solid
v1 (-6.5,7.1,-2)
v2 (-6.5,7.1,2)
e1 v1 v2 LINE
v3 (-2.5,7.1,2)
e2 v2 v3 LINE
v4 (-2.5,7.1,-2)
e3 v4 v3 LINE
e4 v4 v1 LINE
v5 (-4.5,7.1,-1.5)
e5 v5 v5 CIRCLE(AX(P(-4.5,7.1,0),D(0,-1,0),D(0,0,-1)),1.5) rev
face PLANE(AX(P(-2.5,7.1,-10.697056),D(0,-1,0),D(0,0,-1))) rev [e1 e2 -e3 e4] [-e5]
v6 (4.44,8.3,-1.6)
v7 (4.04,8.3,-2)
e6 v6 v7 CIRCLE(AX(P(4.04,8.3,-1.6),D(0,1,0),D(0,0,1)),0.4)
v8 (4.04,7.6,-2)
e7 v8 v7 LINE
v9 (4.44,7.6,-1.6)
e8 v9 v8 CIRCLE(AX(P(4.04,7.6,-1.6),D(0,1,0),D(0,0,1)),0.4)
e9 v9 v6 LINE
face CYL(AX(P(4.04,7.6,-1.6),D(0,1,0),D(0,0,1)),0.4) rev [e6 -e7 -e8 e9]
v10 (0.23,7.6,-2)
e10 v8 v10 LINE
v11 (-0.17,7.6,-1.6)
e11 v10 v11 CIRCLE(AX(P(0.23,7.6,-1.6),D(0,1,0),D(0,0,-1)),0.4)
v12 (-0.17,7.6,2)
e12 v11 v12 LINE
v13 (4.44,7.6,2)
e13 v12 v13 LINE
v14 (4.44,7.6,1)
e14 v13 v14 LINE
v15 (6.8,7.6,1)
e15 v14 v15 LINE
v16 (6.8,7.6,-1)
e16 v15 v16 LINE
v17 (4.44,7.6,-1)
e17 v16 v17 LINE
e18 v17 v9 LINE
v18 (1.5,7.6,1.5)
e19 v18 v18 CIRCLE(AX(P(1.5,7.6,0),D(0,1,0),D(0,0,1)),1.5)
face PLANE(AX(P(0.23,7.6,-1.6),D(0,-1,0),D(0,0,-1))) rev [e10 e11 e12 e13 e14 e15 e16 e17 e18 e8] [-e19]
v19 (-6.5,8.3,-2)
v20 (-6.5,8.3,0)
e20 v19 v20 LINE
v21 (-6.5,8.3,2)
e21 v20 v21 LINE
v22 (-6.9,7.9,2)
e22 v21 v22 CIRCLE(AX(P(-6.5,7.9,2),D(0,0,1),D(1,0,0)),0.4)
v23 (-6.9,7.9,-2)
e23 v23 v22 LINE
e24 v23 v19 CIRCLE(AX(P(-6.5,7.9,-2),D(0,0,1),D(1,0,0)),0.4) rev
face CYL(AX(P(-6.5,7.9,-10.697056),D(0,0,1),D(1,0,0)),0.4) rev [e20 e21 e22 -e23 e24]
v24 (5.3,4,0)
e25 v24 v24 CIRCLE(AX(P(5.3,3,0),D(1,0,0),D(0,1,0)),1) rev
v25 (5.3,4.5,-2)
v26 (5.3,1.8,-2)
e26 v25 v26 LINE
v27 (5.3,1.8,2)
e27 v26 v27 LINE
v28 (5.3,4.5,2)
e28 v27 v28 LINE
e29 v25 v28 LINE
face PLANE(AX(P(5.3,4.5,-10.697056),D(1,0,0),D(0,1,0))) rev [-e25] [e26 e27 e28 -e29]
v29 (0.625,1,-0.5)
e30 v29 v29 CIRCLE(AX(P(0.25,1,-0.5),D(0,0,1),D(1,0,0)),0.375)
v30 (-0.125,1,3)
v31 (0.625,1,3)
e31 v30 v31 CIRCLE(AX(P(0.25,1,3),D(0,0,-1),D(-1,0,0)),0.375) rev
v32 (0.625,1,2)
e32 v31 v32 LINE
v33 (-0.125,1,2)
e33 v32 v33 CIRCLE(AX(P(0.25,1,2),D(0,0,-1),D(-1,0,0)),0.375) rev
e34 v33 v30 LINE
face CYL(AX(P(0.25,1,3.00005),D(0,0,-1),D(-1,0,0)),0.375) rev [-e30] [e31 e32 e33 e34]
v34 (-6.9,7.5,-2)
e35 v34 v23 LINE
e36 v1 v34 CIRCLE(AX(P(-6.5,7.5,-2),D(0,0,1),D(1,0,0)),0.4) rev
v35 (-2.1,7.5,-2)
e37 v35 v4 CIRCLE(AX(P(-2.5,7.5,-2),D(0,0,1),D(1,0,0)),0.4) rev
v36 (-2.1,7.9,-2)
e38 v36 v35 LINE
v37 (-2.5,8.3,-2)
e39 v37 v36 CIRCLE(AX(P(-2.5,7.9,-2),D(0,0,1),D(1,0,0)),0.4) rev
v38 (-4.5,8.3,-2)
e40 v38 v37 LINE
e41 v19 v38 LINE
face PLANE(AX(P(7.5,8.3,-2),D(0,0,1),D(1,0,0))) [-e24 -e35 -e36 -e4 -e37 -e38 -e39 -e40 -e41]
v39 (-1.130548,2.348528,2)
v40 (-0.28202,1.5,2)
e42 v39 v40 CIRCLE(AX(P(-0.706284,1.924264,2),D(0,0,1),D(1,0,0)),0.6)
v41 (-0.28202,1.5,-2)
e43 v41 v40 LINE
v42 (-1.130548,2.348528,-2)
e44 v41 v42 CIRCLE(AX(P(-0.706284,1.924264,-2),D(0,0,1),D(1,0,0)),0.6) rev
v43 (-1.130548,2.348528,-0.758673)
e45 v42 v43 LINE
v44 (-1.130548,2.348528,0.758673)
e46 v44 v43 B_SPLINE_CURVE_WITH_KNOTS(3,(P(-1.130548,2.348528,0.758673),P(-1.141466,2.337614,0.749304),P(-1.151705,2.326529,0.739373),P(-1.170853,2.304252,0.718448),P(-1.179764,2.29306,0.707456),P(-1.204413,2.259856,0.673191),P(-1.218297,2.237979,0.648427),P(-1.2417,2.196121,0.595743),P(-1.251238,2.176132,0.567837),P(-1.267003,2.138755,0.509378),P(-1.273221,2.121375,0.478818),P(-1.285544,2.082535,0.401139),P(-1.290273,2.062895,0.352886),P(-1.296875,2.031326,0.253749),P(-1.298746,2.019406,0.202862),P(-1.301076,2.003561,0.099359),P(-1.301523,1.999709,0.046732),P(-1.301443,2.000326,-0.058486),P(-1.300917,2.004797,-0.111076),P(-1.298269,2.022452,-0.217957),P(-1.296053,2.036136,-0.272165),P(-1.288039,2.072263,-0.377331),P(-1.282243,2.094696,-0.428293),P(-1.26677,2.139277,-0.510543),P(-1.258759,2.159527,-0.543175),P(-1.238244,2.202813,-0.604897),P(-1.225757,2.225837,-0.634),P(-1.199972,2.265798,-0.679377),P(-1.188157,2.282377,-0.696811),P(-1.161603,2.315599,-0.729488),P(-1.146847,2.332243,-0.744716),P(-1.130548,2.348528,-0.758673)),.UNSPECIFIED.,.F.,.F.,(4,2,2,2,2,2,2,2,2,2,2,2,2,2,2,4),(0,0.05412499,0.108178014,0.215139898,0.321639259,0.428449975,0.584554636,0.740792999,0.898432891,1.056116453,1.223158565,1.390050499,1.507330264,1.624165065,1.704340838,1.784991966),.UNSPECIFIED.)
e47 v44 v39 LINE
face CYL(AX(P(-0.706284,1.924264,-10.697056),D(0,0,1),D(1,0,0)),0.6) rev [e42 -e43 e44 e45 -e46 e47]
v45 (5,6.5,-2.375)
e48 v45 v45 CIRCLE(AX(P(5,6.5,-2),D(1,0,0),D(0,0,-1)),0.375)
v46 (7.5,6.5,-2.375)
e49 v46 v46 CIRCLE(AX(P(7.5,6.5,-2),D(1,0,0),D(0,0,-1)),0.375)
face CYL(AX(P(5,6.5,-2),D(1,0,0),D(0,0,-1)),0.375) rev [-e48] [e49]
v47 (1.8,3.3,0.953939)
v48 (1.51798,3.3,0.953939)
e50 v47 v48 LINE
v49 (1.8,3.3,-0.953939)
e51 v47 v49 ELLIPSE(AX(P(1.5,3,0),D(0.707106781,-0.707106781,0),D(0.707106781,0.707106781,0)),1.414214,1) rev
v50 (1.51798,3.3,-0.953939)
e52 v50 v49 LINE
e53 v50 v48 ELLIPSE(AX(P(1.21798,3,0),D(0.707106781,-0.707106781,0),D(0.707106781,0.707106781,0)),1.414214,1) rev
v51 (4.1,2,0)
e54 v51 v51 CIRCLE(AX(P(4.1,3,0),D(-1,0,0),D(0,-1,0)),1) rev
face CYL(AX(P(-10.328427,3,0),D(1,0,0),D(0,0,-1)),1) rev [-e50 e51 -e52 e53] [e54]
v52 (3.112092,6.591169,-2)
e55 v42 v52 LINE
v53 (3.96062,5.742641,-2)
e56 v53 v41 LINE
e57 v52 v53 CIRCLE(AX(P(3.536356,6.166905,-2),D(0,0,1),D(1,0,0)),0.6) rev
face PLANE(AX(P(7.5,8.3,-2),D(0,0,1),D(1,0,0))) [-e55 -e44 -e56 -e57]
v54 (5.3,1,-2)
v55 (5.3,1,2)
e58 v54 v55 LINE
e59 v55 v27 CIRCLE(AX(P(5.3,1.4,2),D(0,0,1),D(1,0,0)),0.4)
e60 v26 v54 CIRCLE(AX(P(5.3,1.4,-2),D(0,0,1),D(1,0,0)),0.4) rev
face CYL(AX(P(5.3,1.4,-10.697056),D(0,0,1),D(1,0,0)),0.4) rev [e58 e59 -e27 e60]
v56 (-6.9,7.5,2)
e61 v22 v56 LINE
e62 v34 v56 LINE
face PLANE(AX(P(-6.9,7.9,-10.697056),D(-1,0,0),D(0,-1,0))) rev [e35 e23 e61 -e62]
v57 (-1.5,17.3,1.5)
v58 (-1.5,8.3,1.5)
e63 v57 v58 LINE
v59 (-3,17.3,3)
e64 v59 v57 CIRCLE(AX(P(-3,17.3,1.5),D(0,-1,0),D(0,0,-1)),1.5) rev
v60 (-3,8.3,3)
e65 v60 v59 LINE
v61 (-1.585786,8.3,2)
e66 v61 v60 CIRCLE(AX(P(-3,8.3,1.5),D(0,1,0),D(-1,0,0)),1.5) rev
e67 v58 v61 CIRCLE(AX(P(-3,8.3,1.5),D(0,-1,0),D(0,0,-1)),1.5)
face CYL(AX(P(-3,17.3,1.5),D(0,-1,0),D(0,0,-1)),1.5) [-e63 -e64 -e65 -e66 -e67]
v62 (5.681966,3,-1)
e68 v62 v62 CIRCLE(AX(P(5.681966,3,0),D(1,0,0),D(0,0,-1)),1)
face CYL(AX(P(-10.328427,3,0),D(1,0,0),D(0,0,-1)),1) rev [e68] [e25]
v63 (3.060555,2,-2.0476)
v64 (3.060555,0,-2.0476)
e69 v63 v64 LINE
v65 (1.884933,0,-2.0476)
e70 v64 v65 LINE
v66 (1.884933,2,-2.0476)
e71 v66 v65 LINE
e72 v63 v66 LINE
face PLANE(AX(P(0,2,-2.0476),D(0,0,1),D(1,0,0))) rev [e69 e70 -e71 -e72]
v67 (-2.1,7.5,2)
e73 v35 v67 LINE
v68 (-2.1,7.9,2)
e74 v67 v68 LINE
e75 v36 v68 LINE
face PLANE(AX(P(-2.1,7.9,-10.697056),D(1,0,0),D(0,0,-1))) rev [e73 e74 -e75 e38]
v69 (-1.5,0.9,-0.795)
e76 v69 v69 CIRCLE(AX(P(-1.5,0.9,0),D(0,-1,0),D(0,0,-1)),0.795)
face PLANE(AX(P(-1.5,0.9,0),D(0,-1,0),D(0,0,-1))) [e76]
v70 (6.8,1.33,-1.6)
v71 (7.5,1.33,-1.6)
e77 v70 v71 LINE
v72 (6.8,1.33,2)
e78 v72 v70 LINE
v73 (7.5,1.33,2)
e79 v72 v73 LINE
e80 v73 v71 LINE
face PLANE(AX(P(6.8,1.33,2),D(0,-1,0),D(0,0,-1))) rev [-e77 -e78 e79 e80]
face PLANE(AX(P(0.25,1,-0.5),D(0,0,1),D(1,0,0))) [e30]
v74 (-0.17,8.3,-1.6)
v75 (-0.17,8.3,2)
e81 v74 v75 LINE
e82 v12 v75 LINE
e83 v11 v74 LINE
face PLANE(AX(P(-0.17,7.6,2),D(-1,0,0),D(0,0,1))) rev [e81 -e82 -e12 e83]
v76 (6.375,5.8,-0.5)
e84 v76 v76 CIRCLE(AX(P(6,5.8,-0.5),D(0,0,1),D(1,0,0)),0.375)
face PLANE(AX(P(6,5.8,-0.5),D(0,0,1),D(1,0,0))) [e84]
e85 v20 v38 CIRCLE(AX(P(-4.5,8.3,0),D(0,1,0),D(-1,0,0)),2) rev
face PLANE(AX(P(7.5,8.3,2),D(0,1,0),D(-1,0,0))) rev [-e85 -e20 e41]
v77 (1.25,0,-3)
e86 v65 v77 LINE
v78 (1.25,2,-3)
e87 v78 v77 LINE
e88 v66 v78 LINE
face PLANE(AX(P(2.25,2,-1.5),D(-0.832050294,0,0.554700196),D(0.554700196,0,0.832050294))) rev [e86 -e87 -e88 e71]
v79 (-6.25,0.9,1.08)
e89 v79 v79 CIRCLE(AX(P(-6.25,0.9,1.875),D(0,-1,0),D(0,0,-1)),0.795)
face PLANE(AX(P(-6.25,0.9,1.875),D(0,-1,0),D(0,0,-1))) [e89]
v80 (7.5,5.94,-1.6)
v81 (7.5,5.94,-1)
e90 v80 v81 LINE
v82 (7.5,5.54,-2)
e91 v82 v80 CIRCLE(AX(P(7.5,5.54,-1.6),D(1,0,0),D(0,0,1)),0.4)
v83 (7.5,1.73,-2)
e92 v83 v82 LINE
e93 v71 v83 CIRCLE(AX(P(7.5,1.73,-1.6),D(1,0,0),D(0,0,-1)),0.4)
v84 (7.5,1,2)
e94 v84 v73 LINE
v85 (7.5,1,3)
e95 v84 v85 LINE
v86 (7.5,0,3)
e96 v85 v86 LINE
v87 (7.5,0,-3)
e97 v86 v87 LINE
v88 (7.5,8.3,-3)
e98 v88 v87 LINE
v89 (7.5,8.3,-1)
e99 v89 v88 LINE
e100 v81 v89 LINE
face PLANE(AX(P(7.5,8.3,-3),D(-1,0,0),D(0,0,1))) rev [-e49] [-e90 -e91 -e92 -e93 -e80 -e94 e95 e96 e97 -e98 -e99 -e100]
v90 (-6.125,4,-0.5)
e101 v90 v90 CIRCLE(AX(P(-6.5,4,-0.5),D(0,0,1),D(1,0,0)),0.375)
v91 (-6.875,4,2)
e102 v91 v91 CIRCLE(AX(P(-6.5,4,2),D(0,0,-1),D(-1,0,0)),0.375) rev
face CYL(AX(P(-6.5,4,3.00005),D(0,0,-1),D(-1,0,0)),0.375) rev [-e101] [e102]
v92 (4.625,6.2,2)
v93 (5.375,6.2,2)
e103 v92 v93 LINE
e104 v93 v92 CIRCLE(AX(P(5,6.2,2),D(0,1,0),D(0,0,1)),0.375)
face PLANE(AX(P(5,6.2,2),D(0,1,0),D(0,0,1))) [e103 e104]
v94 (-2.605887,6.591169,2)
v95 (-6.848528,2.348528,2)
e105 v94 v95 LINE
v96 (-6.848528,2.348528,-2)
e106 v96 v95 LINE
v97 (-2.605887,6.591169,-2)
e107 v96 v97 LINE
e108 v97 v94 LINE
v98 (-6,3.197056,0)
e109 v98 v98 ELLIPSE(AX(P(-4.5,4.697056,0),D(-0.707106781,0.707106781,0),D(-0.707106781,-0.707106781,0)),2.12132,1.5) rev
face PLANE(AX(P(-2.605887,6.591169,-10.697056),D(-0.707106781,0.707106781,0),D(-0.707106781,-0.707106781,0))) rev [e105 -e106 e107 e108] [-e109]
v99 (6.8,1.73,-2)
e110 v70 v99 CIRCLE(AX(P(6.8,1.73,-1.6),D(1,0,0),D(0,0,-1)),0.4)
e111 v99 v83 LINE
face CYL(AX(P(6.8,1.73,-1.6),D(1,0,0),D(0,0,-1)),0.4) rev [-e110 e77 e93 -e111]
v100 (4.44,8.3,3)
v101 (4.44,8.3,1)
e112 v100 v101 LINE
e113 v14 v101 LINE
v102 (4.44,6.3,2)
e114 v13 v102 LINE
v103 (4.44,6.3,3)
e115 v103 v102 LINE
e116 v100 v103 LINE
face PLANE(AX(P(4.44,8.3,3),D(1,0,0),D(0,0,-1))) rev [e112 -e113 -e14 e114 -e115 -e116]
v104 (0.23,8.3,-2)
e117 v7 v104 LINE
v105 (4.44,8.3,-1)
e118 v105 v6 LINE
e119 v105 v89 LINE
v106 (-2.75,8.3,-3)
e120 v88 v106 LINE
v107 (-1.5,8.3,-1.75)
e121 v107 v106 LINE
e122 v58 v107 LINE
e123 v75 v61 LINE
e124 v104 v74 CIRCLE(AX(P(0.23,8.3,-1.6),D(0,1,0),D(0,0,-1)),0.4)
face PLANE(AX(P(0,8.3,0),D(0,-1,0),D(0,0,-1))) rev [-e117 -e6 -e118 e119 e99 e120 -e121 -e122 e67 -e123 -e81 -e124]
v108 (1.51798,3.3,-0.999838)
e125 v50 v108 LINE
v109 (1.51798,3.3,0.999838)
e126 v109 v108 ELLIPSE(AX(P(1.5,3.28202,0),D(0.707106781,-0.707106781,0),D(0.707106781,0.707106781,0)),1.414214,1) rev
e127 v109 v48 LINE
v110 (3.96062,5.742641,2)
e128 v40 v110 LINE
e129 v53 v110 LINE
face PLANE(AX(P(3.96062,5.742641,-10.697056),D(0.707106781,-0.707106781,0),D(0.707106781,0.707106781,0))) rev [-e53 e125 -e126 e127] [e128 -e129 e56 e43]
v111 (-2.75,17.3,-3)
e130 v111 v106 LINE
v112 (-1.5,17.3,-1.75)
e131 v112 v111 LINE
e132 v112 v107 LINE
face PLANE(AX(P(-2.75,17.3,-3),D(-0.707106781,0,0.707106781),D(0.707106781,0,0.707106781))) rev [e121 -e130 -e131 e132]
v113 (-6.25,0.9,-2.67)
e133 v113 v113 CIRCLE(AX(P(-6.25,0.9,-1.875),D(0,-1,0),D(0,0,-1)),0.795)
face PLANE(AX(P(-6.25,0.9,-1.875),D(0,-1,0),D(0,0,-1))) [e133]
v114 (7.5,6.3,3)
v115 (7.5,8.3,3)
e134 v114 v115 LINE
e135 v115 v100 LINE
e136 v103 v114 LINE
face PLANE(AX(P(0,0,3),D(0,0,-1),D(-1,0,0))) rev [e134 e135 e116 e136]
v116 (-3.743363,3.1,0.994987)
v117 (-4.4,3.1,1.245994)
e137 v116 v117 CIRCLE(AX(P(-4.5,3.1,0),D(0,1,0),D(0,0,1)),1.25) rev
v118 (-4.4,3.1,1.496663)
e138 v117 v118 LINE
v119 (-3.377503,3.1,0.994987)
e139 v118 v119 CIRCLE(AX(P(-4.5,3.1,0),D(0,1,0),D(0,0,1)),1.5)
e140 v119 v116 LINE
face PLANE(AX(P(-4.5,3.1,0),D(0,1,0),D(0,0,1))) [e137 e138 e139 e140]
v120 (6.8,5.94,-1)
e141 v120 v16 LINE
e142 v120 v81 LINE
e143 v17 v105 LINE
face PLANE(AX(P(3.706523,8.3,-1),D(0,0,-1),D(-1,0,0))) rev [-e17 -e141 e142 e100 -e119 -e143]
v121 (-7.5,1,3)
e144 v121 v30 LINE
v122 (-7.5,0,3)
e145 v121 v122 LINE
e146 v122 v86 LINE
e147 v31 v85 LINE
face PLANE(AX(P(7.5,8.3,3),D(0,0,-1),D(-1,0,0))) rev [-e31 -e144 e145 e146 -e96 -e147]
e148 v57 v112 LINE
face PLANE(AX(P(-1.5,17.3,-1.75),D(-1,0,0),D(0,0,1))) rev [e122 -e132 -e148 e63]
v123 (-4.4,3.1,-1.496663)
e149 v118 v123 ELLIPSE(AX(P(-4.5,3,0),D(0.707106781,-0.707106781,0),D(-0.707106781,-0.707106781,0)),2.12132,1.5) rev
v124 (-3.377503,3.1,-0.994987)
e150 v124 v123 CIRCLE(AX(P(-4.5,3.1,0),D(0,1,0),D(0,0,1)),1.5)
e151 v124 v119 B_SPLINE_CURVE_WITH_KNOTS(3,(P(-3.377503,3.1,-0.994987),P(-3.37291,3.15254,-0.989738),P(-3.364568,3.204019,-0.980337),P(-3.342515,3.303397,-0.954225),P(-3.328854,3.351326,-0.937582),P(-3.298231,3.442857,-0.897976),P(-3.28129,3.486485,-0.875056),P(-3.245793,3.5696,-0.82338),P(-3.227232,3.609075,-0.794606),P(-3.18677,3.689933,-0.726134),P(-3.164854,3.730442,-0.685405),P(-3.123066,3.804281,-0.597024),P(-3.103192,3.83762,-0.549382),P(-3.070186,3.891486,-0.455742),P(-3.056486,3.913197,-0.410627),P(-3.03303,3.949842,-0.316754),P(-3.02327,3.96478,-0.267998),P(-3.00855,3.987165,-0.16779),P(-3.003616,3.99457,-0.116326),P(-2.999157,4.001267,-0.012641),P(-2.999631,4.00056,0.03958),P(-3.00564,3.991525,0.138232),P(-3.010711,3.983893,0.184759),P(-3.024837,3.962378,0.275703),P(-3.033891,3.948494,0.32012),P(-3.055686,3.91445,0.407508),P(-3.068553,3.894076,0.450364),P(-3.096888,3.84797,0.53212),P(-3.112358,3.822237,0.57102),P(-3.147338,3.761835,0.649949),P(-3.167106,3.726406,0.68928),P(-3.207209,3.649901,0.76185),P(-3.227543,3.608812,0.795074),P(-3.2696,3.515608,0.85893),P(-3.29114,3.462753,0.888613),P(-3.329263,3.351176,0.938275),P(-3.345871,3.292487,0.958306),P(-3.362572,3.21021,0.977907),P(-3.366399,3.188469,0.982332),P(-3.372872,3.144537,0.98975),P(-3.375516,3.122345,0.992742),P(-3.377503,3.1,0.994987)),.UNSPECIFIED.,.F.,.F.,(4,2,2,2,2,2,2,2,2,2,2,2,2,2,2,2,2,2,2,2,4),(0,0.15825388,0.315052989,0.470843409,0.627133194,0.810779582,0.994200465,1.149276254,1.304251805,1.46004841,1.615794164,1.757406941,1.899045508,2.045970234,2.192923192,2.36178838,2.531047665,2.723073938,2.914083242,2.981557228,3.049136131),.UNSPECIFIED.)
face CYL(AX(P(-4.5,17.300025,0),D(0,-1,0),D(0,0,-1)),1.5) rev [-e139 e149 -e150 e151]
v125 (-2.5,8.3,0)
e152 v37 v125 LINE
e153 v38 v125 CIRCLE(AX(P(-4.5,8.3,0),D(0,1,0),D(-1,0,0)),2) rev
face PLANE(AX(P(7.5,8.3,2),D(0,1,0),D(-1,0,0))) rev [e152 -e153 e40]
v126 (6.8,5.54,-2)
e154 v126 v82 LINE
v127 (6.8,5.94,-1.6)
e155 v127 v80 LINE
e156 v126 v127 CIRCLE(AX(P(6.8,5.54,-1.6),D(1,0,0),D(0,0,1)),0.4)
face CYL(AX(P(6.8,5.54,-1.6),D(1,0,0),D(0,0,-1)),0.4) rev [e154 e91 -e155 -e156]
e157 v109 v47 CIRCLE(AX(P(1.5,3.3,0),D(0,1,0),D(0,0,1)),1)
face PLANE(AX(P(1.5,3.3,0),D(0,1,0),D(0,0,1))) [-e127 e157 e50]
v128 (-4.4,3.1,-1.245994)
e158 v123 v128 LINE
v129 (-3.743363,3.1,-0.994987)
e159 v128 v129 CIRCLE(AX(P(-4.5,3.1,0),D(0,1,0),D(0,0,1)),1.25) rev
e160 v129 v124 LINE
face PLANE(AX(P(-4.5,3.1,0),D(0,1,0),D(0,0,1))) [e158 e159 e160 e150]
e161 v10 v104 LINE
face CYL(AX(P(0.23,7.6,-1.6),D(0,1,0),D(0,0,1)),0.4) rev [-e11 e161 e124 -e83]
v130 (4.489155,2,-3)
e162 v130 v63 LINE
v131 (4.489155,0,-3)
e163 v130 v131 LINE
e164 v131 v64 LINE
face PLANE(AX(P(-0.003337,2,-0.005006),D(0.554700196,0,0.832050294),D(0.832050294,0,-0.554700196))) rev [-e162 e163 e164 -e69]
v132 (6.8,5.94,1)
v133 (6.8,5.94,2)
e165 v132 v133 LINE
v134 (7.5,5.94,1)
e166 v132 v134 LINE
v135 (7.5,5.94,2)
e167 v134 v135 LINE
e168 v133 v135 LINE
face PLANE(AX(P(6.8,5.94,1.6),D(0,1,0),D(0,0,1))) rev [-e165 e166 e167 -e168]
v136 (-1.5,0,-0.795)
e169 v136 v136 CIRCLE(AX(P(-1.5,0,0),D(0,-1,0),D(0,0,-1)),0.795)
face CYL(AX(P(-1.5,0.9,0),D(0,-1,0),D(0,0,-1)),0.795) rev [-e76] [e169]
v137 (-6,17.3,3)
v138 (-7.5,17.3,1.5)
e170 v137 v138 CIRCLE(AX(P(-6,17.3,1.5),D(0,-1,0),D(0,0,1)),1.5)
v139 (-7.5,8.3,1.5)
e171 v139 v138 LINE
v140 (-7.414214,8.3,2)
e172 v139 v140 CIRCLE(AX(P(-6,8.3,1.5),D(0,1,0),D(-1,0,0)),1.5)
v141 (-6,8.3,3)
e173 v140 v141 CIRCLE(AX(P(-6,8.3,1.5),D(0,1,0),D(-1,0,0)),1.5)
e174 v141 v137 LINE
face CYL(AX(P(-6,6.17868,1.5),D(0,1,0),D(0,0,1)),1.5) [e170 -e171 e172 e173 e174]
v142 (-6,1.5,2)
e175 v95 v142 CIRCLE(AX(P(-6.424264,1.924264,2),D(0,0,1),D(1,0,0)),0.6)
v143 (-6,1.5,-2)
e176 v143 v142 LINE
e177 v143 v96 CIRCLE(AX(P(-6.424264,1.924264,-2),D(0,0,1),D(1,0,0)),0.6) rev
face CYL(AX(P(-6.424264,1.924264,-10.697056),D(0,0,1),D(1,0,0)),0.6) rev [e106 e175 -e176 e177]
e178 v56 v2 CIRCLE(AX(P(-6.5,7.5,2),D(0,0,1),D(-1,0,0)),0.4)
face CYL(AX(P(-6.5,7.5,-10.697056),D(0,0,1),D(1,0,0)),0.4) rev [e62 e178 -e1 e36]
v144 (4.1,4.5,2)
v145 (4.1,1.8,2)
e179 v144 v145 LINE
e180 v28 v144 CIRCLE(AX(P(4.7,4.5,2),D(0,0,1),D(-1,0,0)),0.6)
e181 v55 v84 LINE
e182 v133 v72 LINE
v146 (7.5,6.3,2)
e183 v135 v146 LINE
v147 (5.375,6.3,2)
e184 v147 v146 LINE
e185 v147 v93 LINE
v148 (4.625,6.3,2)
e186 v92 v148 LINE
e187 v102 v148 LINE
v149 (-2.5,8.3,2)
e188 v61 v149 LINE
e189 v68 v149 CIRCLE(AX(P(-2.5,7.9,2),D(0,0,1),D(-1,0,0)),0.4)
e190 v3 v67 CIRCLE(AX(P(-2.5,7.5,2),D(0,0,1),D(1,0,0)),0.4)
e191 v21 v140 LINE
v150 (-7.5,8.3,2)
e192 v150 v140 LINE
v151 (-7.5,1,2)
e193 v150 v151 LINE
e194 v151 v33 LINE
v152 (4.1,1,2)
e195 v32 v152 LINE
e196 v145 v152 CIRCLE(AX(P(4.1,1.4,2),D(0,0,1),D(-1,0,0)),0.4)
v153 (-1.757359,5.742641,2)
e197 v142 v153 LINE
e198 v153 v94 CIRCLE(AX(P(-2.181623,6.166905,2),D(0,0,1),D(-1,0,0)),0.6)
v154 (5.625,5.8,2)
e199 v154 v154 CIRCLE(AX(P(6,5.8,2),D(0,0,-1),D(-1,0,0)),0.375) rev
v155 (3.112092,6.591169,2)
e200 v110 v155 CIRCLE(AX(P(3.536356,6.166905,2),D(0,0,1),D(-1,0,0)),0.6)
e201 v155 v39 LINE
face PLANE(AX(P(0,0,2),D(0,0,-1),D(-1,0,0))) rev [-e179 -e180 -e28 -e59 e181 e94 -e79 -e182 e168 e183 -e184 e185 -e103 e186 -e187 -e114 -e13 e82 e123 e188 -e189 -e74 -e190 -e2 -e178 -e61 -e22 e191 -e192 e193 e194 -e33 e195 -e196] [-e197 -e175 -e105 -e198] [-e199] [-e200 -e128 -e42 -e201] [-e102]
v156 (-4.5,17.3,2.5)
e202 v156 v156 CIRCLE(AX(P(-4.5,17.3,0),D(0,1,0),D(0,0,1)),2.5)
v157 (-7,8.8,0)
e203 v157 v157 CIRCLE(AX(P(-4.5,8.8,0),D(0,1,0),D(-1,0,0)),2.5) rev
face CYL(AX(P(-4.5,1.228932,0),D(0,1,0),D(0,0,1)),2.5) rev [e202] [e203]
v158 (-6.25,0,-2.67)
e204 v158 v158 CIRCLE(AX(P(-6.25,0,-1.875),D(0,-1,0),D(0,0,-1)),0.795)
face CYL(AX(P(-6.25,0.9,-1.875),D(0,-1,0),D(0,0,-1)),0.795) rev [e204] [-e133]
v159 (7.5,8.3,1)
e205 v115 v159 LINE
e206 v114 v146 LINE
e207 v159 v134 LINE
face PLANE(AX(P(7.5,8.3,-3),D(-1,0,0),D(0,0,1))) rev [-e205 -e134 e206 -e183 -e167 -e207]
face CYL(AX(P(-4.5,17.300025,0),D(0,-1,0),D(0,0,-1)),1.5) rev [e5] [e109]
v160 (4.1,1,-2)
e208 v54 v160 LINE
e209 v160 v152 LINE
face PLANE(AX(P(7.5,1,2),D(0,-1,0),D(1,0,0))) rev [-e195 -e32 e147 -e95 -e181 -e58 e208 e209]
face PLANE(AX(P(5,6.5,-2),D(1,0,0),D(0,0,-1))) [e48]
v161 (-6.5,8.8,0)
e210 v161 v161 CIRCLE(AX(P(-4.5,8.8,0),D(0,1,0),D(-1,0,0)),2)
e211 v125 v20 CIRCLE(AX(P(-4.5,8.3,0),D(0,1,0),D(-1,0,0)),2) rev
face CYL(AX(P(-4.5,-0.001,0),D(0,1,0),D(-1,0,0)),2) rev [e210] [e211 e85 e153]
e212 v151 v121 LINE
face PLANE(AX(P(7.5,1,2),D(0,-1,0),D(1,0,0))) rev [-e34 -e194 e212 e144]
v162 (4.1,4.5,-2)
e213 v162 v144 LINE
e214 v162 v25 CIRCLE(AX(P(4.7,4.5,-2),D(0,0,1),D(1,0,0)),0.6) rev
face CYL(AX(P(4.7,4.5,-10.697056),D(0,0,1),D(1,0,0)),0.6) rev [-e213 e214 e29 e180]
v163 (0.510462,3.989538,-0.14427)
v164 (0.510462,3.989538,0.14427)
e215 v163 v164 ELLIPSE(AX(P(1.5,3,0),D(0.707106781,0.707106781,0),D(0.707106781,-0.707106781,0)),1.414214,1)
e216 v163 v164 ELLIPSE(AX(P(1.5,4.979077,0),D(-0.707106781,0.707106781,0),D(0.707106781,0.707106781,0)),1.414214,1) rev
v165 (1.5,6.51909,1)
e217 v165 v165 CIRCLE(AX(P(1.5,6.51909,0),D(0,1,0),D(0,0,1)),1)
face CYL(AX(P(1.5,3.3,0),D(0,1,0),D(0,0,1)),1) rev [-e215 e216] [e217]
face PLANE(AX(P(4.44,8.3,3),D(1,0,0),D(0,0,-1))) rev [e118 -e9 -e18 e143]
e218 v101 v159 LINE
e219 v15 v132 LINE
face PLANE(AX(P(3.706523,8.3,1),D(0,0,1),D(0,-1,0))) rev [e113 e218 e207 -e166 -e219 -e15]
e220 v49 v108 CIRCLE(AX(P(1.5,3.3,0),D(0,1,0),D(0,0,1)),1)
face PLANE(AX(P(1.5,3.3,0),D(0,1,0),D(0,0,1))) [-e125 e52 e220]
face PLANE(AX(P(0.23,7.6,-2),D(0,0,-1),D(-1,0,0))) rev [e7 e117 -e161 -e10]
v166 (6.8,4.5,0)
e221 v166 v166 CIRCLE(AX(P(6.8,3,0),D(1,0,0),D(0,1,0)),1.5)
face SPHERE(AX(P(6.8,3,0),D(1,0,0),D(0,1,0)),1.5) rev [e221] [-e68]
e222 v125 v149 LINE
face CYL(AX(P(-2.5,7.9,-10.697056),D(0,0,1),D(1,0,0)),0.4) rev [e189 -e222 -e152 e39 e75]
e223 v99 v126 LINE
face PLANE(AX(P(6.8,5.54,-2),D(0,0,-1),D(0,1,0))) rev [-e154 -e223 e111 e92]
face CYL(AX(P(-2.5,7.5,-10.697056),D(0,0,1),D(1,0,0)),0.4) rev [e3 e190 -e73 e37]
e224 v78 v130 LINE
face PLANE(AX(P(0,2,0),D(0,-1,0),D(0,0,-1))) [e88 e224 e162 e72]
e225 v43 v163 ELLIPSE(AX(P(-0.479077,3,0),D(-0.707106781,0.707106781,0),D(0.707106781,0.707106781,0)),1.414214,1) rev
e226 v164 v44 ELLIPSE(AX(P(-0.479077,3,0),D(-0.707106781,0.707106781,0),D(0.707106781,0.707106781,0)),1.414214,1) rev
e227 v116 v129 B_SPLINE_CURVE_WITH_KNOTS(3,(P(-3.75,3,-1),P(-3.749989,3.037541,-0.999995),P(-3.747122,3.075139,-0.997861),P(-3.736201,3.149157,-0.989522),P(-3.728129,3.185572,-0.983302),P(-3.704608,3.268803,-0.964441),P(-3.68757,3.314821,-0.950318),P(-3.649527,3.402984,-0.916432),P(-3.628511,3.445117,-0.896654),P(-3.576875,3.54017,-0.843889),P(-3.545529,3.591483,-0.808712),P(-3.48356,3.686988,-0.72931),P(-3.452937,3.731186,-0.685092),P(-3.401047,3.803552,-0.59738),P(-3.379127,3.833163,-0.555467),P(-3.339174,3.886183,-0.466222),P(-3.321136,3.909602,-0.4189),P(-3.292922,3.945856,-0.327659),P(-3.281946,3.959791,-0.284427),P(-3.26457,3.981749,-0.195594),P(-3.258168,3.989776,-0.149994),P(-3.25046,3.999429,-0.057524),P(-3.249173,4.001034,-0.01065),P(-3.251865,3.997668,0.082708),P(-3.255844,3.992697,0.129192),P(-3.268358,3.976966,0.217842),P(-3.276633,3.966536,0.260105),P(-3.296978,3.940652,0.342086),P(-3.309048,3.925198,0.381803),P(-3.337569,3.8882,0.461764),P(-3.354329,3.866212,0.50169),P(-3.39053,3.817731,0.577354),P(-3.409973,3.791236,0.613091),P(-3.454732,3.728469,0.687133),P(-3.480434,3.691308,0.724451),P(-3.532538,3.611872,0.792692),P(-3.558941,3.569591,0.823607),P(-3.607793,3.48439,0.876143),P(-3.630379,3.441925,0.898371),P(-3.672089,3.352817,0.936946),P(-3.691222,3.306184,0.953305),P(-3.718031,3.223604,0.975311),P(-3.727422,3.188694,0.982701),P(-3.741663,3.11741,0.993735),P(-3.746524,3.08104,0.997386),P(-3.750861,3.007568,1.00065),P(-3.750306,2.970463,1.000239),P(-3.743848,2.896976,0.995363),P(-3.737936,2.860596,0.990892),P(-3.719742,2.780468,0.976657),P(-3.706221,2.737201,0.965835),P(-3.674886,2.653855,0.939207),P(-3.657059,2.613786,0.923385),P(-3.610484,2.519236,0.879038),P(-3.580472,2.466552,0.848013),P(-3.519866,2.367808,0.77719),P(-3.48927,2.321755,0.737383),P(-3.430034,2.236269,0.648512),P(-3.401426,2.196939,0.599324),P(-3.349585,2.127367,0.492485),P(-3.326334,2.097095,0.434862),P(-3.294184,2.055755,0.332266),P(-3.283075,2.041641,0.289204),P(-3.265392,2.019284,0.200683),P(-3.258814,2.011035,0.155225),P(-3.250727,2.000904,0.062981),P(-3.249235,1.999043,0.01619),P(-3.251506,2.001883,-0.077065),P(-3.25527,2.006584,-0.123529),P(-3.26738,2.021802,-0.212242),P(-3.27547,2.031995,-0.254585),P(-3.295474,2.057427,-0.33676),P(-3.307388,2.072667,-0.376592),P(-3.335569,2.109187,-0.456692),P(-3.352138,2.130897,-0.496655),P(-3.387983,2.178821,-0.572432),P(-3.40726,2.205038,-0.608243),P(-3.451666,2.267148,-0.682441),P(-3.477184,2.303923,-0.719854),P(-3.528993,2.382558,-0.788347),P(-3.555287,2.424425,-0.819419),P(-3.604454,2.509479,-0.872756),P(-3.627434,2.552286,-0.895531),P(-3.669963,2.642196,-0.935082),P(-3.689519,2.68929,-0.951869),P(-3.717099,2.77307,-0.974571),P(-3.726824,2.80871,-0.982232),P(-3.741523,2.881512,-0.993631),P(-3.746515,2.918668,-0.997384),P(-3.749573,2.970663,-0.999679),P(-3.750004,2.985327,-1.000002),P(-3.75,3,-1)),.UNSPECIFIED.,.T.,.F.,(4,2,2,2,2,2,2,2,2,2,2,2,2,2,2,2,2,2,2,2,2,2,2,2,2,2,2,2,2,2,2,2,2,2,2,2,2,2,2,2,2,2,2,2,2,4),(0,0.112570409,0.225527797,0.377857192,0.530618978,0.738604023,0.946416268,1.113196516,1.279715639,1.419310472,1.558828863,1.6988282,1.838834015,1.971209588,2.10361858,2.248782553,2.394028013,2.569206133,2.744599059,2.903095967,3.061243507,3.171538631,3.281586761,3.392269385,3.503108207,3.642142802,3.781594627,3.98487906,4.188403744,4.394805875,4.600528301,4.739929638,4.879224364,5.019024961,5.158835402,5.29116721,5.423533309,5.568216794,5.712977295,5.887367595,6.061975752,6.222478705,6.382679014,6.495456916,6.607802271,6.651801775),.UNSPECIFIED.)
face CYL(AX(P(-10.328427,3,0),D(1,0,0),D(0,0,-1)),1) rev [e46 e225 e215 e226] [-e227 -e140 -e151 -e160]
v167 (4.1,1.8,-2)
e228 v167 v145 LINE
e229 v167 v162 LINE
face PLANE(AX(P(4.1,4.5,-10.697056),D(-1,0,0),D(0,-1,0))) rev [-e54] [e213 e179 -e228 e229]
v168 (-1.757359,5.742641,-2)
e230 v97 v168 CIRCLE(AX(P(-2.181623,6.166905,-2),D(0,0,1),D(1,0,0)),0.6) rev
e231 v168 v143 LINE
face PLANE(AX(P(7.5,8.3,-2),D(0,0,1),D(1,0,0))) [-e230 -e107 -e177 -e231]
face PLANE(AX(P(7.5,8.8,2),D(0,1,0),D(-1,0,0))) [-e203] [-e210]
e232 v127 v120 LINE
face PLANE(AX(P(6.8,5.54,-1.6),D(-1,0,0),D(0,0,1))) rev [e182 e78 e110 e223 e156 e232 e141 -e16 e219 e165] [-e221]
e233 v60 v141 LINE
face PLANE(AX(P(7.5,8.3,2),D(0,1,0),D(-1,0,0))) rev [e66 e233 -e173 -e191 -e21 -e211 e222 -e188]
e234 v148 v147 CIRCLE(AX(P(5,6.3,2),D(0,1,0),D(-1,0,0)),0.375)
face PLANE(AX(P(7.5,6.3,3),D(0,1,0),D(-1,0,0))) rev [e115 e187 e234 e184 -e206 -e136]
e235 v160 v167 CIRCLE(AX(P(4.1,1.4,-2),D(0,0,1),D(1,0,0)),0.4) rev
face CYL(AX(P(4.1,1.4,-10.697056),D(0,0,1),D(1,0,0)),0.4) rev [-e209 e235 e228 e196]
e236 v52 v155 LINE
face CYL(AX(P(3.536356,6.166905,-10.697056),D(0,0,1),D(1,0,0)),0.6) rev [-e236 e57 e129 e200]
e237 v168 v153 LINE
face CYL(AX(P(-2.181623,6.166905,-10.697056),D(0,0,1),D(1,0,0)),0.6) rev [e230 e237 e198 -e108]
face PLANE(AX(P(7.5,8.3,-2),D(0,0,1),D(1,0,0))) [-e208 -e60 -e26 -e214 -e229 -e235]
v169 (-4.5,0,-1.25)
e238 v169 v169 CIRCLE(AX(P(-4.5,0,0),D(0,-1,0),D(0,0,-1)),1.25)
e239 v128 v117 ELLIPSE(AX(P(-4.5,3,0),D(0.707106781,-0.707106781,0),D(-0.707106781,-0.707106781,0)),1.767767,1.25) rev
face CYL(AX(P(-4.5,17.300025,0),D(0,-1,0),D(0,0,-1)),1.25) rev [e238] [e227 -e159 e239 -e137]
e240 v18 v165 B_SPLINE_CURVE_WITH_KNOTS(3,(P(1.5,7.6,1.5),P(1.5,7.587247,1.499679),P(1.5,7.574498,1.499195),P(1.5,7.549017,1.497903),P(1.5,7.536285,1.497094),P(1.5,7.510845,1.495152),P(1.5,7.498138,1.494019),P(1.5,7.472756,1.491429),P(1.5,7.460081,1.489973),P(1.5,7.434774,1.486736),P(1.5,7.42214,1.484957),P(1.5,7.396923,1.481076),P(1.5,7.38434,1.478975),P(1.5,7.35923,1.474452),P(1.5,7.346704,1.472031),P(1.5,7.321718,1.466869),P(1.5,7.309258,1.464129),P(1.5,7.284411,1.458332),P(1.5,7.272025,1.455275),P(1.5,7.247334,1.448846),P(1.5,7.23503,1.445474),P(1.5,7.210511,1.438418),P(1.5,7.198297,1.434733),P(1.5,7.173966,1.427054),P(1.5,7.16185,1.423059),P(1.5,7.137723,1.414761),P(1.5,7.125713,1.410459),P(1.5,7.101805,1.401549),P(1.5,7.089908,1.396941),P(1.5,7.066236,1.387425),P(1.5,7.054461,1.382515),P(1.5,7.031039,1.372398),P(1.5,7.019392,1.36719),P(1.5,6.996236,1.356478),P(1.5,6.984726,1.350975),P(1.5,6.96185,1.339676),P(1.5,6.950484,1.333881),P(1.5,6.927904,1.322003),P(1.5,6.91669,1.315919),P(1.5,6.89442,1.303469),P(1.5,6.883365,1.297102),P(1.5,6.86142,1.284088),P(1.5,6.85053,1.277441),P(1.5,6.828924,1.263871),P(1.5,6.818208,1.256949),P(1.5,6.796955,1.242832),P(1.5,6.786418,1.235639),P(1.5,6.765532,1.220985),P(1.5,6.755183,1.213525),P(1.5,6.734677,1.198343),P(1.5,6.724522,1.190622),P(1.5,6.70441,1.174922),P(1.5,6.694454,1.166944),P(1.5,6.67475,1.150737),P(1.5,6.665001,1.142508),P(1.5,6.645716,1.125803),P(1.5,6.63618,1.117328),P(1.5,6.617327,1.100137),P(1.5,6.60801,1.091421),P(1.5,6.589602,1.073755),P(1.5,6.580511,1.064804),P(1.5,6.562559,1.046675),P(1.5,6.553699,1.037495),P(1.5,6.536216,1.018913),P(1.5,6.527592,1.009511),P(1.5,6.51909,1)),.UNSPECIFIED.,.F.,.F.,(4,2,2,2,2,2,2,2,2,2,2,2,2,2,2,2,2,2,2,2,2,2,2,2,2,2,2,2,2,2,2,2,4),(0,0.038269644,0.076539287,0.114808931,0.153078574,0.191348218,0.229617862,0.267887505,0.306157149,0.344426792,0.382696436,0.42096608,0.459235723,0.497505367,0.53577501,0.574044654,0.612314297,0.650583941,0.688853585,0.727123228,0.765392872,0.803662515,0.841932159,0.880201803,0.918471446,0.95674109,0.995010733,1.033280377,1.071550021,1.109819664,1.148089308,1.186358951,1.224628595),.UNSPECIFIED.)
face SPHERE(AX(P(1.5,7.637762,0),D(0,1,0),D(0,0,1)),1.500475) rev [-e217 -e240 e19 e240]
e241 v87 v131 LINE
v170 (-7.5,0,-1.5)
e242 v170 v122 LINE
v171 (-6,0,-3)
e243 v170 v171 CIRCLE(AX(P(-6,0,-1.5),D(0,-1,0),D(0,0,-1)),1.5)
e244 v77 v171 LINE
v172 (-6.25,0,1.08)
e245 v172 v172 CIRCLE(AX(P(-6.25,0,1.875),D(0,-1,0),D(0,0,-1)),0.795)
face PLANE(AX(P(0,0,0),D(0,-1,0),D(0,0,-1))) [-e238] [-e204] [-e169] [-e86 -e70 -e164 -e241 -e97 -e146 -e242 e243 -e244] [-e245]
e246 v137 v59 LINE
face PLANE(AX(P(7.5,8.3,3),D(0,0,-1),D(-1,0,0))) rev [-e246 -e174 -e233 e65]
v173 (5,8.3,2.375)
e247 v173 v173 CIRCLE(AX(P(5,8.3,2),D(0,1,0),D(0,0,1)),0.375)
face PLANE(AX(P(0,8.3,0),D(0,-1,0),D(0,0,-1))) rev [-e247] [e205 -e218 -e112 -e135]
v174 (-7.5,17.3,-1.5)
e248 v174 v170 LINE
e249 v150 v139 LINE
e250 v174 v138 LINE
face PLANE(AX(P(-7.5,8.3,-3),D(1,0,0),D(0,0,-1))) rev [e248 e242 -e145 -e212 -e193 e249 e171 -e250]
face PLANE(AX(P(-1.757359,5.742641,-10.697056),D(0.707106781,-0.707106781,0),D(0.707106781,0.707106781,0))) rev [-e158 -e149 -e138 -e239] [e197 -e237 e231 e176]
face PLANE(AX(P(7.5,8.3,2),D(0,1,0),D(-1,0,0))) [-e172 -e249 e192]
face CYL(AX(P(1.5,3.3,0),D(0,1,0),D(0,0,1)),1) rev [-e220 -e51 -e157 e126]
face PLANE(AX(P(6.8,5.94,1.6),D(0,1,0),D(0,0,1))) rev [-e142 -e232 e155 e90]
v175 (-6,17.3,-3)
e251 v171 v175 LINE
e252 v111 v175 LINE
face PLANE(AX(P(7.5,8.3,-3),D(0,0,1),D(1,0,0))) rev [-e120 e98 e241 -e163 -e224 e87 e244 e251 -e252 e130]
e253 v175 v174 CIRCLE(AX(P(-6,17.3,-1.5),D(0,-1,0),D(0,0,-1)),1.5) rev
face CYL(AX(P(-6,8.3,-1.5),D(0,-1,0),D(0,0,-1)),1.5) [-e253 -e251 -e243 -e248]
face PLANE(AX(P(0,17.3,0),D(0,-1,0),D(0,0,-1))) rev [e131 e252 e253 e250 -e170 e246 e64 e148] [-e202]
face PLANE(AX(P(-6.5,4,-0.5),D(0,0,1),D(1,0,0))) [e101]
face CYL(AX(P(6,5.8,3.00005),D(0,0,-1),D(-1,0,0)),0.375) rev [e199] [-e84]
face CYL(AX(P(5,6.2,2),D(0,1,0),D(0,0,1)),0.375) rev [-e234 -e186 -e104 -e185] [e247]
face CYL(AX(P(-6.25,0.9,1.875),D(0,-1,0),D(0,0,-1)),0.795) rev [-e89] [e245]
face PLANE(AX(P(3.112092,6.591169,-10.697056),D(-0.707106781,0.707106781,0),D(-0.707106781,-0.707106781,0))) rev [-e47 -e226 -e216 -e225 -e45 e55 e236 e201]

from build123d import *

# Parameters (mm, degrees)
SKETCH1_W                        = 15
SKETCH1_H                        = 6
MAIN_BODY_EXT_DEPTH              = 8.3
EMISSION_PATH_EXT_DEPTH          = 9
SKETCH3_R                        = 1.25
EMISSION_AND_GRIN_CUT_DEPTH      = 20.092931
SKETCH4_R                        = 1
DRUM_LENS_CUT_DEPTH              = 13
SKETCH41_R                       = 1
ADDTL_LIGHT_SOURCE_DEPTH         = 5
SKETCH5_W                        = 15
SKETCH5_H                        = 7.3
FILTERCOVER_CUT1_DEPTH           = 1
TOP_LED_SCREW_W                  = 3.06
TOP_LED_SCREW_H                  = 2
BOSS_EXTRUDE1_DEPTH              = 1
FILTERSET_CUT2_DEPTH             = 4
SKETCH10_R                       = 2.5
EMISSION_LENS_CUT_DEPTH          = 8.5
SKETCH15_R                       = 0.795
MAGNETS_CUT_DEPTH                = 0.9
SCREW_HOLES_CUT_DEPTH            = 20.507434
SCREW_HOLES_CUT_DEPTH_BACK       = 2.5
SKETCH18_R                       = 0.375
EXTERNAL_FILLET_1_R              = 1.5
VERTICAL_PATH_CUT_DEPTH          = 14.011149
VERTICAL_PATH_CUT_DEPTH_BACK     = 4
SKETCH28_R                       = 1.5
CUT_EXTRUDE_ORIGINAL_LIGHT_DEPTH = 0.7
CUT_EXTRUDE_ADDTL_LIGHT_DEPTH    = 0.7
SKETCH29_R                       = 0.375
SIDE_LED_SCREW_DEPTH             = 2.5
SKETCH32_W                       = 2
SKETCH32_H                       = 2.36
SIDE_WIRE_SLOT_CUT_DEPTH         = 0.7
SKETCH45_W                       = 2.36
SKETCH45_H                       = 2
TOP_LED_SLOT_DEPTH               = 0.7
CUT_EXTRUDE16_DEPTH              = 9
CUT_EXTRUDE17_REACH              = 13.945
SKETCH37_R                       = 2
SKETCH51_R                       = 0.375
TOP_LE_SCREW_DEPTH               = 2.1
NOTCH_EXTRUDE_DEPTH              = 2


with BuildPart() as part:
    # Sketch1 → Main Body Ext (new body)
    with BuildSketch(Plane(origin=(0, 0, 0), x_dir=(1, 0, 0), z_dir=(0, 1, 0))):
        Rectangle(SKETCH1_W, SKETCH1_H)
    extrude(amount=MAIN_BODY_EXT_DEPTH)

    # Sketch8 → Emission Path Ext (add)
    with BuildSketch(Plane(origin=(0, 8.3, 0), x_dir=(1, 0, 0), z_dir=(0, 1, 0))):
        Polygon((-2.75, 3), (-1.5, 1.75), (-1.5, -3), (-7.5, -3), (-7.5, 3), align=None)
    extrude(amount=EMISSION_PATH_EXT_DEPTH)

    # Sketch3 → Emission and Grin Cut (cut, through all)
    with BuildSketch(Plane.XZ):
        with Locations(Location((-4.5, 0, 0), (0, 0, 270))):
            Circle(SKETCH3_R)
    extrude(amount=-EMISSION_AND_GRIN_CUT_DEPTH, mode=Mode.SUBTRACT)

    # Sketch4 → Drum Lens Cut (cut)
    with BuildSketch(Plane(origin=(7.5, 0, 0), x_dir=(0, 0, -1), z_dir=(1, 0, 0))):
        with Locations((0, 3)):
            Circle(SKETCH4_R)
    extrude(amount=-DRUM_LENS_CUT_DEPTH, mode=Mode.SUBTRACT)

    # Sketch41 → Addtl Light Source (cut)
    with BuildSketch(Plane(origin=(0, 8.3, 0), x_dir=(1, 0, 0), z_dir=(0, 1, 0))):
        with Locations(Location((1.5, 0, 0), (0, 0, 270))):
            Circle(SKETCH41_R)
    extrude(amount=-ADDTL_LIGHT_SOURCE_DEPTH, mode=Mode.SUBTRACT)

    # Sketch5 → FilterCover Cut1 (cut)
    with BuildSketch(Plane.XY.offset(3)):
        with Locations((0, 4.65)):
            Rectangle(SKETCH5_W, SKETCH5_H)
    extrude(amount=-FILTERCOVER_CUT1_DEPTH, mode=Mode.SUBTRACT)

    # Top-LED-Screw → Boss-Extrude1 (add)
    with BuildSketch(Plane.XY.offset(2)):
        with Locations((5.97, 7.3)):
            Rectangle(TOP_LED_SCREW_W, TOP_LED_SCREW_H)
    extrude(amount=BOSS_EXTRUDE1_DEPTH)

    # Sketch6 → FilterSet Cut2 (cut)
    with BuildSketch(Plane.XY.offset(2)):
        with BuildLine():
            Line((5.3, 4.5), (5.3, 1.8))
            ThreePointArc((5.3, 1.8), (5.7, 1.4), (5.3, 1))
            Line((5.3, 1), (4.1, 1))
            ThreePointArc((4.1, 1), (3.7, 1.4), (4.1, 1.8))
            Line((4.1, 1.8), (4.1, 4.5))
            ThreePointArc((4.1, 4.5), (4.7, 5.1), (5.3, 4.5))
        make_face()
        with BuildLine():
            Line((-6.9, 7.9), (-6.9, 7.5))
            ThreePointArc((-6.9, 7.5), (-6.782843, 7.217157), (-6.5, 7.1))
            Line((-6.5, 7.1), (-2.5, 7.1))
            ThreePointArc((-2.5, 7.1), (-2.217157, 7.217157), (-2.1, 7.5))
            Line((-2.1, 7.5), (-2.1, 7.9))
            ThreePointArc((-2.1, 7.9), (-2.217157, 8.182843), (-2.5, 8.3))
            Line((-2.5, 8.3), (-6.5, 8.3))
            ThreePointArc((-6.5, 8.3), (-6.782843, 8.182843), (-6.9, 7.9))
        make_face()
        with BuildLine():
            Line((-2.605887, 6.591169), (-6.848528, 2.348528))
            ThreePointArc((-6.848528, 2.348528), (-6.848528, 1.5), (-6, 1.5))
            Line((-6, 1.5), (-1.757359, 5.742641))
            ThreePointArc((-1.757359, 5.742641), (-1.757359, 6.591169), (-2.605887, 6.591169))
        make_face()
        with BuildLine():
            Line((3.112092, 6.591169), (-1.130548, 2.348528))
            ThreePointArc((-1.130548, 2.348528), (-1.130548, 1.5), (-0.28202, 1.5))
            Line((-0.28202, 1.5), (3.96062, 5.742641))
            ThreePointArc((3.96062, 5.742641), (3.96062, 6.591169), (3.112092, 6.591169))
        make_face()
    extrude(amount=-FILTERSET_CUT2_DEPTH, mode=Mode.SUBTRACT)

    # Sketch10 → Emission Lens Cut (cut)
    with BuildSketch(Plane(origin=(0, 17.3, 0), x_dir=(1, 0, 0), z_dir=(0, 1, 0))):
        with Locations(Location((-4.5, 0, 0), (0, 0, 270))):
            Circle(SKETCH10_R)
    extrude(amount=-EMISSION_LENS_CUT_DEPTH, mode=Mode.SUBTRACT)

    # Sketch15 → Magnets Cut (cut)
    with BuildSketch(Plane.XZ):
        with Locations(Location((-6.25, -1.875, 0), (0, 0, 270))):
            Circle(SKETCH15_R)
        with Locations(Location((-6.25, 1.875, 0), (0, 0, 270))):
            Circle(SKETCH15_R)
        with Locations(Location((-1.5, 0, 0), (0, 0, 270))):
            Circle(SKETCH15_R)
    extrude(amount=-MAGNETS_CUT_DEPTH, mode=Mode.SUBTRACT)

    # Sketch18 → Screw Holes Cut (cut, two sides: drawn at the far end of the back side and taken through both)
    with BuildSketch(Plane.XY.offset(2).offset(-SCREW_HOLES_CUT_DEPTH_BACK)):
        with Locations(Location((-6.5, 4, 0), (0, 0, 180))):
            Circle(SKETCH18_R)
        with Locations(Location((6, 5.8, 0), (0, 0, 180))):
            Circle(SKETCH18_R)
        with Locations((0.25, 1)):
            Circle(SKETCH18_R)
    extrude(amount=SCREW_HOLES_CUT_DEPTH + SCREW_HOLES_CUT_DEPTH_BACK, mode=Mode.SUBTRACT)

    # External Fillet 1
    # the kernel refuses this fillet: 1.5 mm, written as the material it takes off along each edge
    with BuildSketch(Plane(origin=(-7.5, -3.75, -3), x_dir=(1, 0, 0), z_dir=(0, 1, 0))) as external_fillet_1_piece_1:
        with BuildLine():
            CenterArc((EXTERNAL_FILLET_1_R, -EXTERNAL_FILLET_1_R), EXTERNAL_FILLET_1_R, 90, 90)
            Line((0, -EXTERNAL_FILLET_1_R), (0, 0))
            Line((0, 0), (EXTERNAL_FILLET_1_R, 0))
        make_face()
    extrude(amount=24.8, mode=Mode.SUBTRACT)
    with BuildSketch(Plane(origin=(-1.5, 8.3, 3), x_dir=(0, 0, -1), z_dir=(0, 1, 0))) as external_fillet_1_piece_2:
        with BuildLine():
            CenterArc((EXTERNAL_FILLET_1_R, EXTERNAL_FILLET_1_R), EXTERNAL_FILLET_1_R, 180, 90)
            Line((0, EXTERNAL_FILLET_1_R), (0, 0))
            Line((0, 0), (EXTERNAL_FILLET_1_R, 0))
        make_face()
    extrude(amount=12.75, mode=Mode.SUBTRACT)

    # Sketch28 → Vertical-Path-Cut (cut, two sides: drawn at the far end of the back side and taken through both)
    with BuildSketch(Plane(origin=(0, 7.1, 0), x_dir=(1, 0, 0), z_dir=(0, 1, 0)).offset(-VERTICAL_PATH_CUT_DEPTH_BACK)):
        with Locations(Location((-4.5, 0, 0), (0, 0, 180))):
            Circle(SKETCH28_R)
    extrude(amount=VERTICAL_PATH_CUT_DEPTH + VERTICAL_PATH_CUT_DEPTH_BACK, mode=Mode.SUBTRACT)

    # Sketch12 → Cut-Extrude Original Light (cut)
    with BuildSketch(Plane(origin=(7.5, 0, 0), x_dir=(0, 0, -1), z_dir=(1, 0, 0))):
        with BuildLine():
            Line((1.6, 5.94), (-1.6, 5.94))
            Line((-1.6, 5.94), (-2, 5.94))
            Line((-2, 5.94), (-2, 1.33))
            Line((-2, 1.33), (1.6, 1.33))
            ThreePointArc((1.6, 1.33), (1.882843, 1.447157), (2, 1.73))
            Line((2, 1.73), (2, 5.54))
            ThreePointArc((2, 5.54), (1.882843, 5.822843), (1.6, 5.94))
        make_face()
    extrude(amount=-CUT_EXTRUDE_ORIGINAL_LIGHT_DEPTH, mode=Mode.SUBTRACT)

    # Sketch44 → Cut-Extrude Addtl Light (cut)
    with BuildSketch(Plane(origin=(0, 8.3, 0), x_dir=(1, 0, 0), z_dir=(0, 1, 0))):
        with BuildLine():
            Line((-0.17, -2), (4.44, -2))
            Line((4.44, -2), (4.44, 1.6))
            ThreePointArc((4.44, 1.6), (4.322843, 1.882843), (4.04, 2))
            Line((4.04, 2), (0.23, 2))
            ThreePointArc((0.23, 2), (-0.052843, 1.882843), (-0.17, 1.6))
            Line((-0.17, 1.6), (-0.17, -2))
        make_face()
    extrude(amount=-CUT_EXTRUDE_ADDTL_LIGHT_DEPTH, mode=Mode.SUBTRACT)

    # Sketch29 → Side-LED-Screw (cut)
    with BuildSketch(Plane(origin=(7.5, 0, 0), x_dir=(0, 0, -1), z_dir=(1, 0, 0))):
        with Locations((2, 6.5)):
            Circle(SKETCH29_R)
    extrude(amount=-SIDE_LED_SCREW_DEPTH, mode=Mode.SUBTRACT)

    # Sketch32 → Side-Wire-Slot-Cut (cut)
    with BuildSketch(Plane(origin=(7.5, 0, 0), x_dir=(0, 0, -1), z_dir=(1, 0, 0))):
        with Locations((0, 7.12)):
            Rectangle(SKETCH32_W, SKETCH32_H)
    extrude(amount=-SIDE_WIRE_SLOT_CUT_DEPTH, mode=Mode.SUBTRACT)

    # Sketch45 → Top-LED-slot (cut)
    with BuildSketch(Plane(origin=(0, 8.3, 0), x_dir=(1, 0, 0), z_dir=(0, 1, 0))):
        with Locations((5.62, 0)):
            Rectangle(SKETCH45_W, SKETCH45_H)
    extrude(amount=-TOP_LED_SLOT_DEPTH, mode=Mode.SUBTRACT)

    # Sketch33 → Side-BallLens_Cut (revolve, cut)
    with BuildSketch(Plane.XY, mode=Mode.PRIVATE) as side_balllens_cut_sk:
        with BuildLine():
            Line((6.8, 3), (5.3, 3))
            ThreePointArc((5.3, 3), (5.73934, 4.06066), (6.8, 4.5))
            Line((6.8, 4.5), (6.8, 3))
        make_face()
    revolve(side_balllens_cut_sk.sketch.rotate(Axis((6.8, 3, 0), (-1, 0, 0)), 84.26086), axis=Axis((6.8, 3, 0), (-1, 0, 0)), mode=Mode.SUBTRACT)

    # Sketch47 → Top-BallLens_Cut (revolve, cut)
    with BuildSketch(Plane(origin=(1.5, 0, 0), x_dir=(0, 0, -1), z_dir=(1, 0, 0))):
        with BuildLine():
            Line((-1.5, 7.6), (0, 7.6))
            Line((0, 7.6), (0, 6.137287))
            ThreePointArc((0, 6.137287), (-1.04756, 6.563498), (-1.5, 7.6))
        make_face()
    revolve(axis=Axis((1.5, 7.6, 0), (0, -1, 0)), mode=Mode.SUBTRACT)

    # Sketch36 → Cut-Extrude16 (cut)
    with BuildSketch(Plane(origin=(0, 17.3, 0), x_dir=(1, 0, 0), z_dir=(0, 1, 0))):
        with BuildLine():
            Line((-7.5, -1.5), (-7.5, -3))
            Line((-7.5, -3), (-6, -3))
            ThreePointArc((-6, -3), (-7.06066, -2.56066), (-7.5, -1.5))
        make_face()
    extrude(amount=-CUT_EXTRUDE16_DEPTH, mode=Mode.SUBTRACT)

    # Sketch37 → Cut-Extrude17 (cut, up to next)
    with BuildSketch(Plane(origin=(0, 8.8, 0), x_dir=(1, 0, 0), z_dir=(0, 1, 0)), mode=Mode.PRIVATE) as cut_extrude17_sk1:
        with Locations(Location((-4.5, 0, 0), (0, 0, 180))):
            Circle(SKETCH37_R)
    cut_extrude17_tool1 = extrude(cut_extrude17_sk1.sketch, amount=-CUT_EXTRUDE17_REACH, mode=Mode.PRIVATE) & part.part
    add(cut_extrude17_tool1.solids().sort_by_distance((-4.5, 8.8, 0))[0], mode=Mode.SUBTRACT)

    # Sketch51 → Top-LE-Screw (cut)
    with BuildSketch(Plane(origin=(0, 8.3, 0), x_dir=(1, 0, 0), z_dir=(0, 1, 0))):
        with Locations(Location((5, -2, 0), (0, 0, 270))):
            Circle(SKETCH51_R)
    extrude(amount=-TOP_LE_SCREW_DEPTH, mode=Mode.SUBTRACT)

    # Notch → Notch-Extrude (cut)
    with BuildSketch(Plane.XZ):
        Polygon((3.060555, -2.0476), (1.884933, -2.0476), (1.884933, -3), (4.489155, -3), align=None)
        Polygon((1.884933, -3), (1.884933, -2.0476), (1.25, -3), align=None)
    extrude(amount=-NOTCH_EXTRUDE_DEPTH, mode=Mode.SUBTRACT)


solid = part.part
